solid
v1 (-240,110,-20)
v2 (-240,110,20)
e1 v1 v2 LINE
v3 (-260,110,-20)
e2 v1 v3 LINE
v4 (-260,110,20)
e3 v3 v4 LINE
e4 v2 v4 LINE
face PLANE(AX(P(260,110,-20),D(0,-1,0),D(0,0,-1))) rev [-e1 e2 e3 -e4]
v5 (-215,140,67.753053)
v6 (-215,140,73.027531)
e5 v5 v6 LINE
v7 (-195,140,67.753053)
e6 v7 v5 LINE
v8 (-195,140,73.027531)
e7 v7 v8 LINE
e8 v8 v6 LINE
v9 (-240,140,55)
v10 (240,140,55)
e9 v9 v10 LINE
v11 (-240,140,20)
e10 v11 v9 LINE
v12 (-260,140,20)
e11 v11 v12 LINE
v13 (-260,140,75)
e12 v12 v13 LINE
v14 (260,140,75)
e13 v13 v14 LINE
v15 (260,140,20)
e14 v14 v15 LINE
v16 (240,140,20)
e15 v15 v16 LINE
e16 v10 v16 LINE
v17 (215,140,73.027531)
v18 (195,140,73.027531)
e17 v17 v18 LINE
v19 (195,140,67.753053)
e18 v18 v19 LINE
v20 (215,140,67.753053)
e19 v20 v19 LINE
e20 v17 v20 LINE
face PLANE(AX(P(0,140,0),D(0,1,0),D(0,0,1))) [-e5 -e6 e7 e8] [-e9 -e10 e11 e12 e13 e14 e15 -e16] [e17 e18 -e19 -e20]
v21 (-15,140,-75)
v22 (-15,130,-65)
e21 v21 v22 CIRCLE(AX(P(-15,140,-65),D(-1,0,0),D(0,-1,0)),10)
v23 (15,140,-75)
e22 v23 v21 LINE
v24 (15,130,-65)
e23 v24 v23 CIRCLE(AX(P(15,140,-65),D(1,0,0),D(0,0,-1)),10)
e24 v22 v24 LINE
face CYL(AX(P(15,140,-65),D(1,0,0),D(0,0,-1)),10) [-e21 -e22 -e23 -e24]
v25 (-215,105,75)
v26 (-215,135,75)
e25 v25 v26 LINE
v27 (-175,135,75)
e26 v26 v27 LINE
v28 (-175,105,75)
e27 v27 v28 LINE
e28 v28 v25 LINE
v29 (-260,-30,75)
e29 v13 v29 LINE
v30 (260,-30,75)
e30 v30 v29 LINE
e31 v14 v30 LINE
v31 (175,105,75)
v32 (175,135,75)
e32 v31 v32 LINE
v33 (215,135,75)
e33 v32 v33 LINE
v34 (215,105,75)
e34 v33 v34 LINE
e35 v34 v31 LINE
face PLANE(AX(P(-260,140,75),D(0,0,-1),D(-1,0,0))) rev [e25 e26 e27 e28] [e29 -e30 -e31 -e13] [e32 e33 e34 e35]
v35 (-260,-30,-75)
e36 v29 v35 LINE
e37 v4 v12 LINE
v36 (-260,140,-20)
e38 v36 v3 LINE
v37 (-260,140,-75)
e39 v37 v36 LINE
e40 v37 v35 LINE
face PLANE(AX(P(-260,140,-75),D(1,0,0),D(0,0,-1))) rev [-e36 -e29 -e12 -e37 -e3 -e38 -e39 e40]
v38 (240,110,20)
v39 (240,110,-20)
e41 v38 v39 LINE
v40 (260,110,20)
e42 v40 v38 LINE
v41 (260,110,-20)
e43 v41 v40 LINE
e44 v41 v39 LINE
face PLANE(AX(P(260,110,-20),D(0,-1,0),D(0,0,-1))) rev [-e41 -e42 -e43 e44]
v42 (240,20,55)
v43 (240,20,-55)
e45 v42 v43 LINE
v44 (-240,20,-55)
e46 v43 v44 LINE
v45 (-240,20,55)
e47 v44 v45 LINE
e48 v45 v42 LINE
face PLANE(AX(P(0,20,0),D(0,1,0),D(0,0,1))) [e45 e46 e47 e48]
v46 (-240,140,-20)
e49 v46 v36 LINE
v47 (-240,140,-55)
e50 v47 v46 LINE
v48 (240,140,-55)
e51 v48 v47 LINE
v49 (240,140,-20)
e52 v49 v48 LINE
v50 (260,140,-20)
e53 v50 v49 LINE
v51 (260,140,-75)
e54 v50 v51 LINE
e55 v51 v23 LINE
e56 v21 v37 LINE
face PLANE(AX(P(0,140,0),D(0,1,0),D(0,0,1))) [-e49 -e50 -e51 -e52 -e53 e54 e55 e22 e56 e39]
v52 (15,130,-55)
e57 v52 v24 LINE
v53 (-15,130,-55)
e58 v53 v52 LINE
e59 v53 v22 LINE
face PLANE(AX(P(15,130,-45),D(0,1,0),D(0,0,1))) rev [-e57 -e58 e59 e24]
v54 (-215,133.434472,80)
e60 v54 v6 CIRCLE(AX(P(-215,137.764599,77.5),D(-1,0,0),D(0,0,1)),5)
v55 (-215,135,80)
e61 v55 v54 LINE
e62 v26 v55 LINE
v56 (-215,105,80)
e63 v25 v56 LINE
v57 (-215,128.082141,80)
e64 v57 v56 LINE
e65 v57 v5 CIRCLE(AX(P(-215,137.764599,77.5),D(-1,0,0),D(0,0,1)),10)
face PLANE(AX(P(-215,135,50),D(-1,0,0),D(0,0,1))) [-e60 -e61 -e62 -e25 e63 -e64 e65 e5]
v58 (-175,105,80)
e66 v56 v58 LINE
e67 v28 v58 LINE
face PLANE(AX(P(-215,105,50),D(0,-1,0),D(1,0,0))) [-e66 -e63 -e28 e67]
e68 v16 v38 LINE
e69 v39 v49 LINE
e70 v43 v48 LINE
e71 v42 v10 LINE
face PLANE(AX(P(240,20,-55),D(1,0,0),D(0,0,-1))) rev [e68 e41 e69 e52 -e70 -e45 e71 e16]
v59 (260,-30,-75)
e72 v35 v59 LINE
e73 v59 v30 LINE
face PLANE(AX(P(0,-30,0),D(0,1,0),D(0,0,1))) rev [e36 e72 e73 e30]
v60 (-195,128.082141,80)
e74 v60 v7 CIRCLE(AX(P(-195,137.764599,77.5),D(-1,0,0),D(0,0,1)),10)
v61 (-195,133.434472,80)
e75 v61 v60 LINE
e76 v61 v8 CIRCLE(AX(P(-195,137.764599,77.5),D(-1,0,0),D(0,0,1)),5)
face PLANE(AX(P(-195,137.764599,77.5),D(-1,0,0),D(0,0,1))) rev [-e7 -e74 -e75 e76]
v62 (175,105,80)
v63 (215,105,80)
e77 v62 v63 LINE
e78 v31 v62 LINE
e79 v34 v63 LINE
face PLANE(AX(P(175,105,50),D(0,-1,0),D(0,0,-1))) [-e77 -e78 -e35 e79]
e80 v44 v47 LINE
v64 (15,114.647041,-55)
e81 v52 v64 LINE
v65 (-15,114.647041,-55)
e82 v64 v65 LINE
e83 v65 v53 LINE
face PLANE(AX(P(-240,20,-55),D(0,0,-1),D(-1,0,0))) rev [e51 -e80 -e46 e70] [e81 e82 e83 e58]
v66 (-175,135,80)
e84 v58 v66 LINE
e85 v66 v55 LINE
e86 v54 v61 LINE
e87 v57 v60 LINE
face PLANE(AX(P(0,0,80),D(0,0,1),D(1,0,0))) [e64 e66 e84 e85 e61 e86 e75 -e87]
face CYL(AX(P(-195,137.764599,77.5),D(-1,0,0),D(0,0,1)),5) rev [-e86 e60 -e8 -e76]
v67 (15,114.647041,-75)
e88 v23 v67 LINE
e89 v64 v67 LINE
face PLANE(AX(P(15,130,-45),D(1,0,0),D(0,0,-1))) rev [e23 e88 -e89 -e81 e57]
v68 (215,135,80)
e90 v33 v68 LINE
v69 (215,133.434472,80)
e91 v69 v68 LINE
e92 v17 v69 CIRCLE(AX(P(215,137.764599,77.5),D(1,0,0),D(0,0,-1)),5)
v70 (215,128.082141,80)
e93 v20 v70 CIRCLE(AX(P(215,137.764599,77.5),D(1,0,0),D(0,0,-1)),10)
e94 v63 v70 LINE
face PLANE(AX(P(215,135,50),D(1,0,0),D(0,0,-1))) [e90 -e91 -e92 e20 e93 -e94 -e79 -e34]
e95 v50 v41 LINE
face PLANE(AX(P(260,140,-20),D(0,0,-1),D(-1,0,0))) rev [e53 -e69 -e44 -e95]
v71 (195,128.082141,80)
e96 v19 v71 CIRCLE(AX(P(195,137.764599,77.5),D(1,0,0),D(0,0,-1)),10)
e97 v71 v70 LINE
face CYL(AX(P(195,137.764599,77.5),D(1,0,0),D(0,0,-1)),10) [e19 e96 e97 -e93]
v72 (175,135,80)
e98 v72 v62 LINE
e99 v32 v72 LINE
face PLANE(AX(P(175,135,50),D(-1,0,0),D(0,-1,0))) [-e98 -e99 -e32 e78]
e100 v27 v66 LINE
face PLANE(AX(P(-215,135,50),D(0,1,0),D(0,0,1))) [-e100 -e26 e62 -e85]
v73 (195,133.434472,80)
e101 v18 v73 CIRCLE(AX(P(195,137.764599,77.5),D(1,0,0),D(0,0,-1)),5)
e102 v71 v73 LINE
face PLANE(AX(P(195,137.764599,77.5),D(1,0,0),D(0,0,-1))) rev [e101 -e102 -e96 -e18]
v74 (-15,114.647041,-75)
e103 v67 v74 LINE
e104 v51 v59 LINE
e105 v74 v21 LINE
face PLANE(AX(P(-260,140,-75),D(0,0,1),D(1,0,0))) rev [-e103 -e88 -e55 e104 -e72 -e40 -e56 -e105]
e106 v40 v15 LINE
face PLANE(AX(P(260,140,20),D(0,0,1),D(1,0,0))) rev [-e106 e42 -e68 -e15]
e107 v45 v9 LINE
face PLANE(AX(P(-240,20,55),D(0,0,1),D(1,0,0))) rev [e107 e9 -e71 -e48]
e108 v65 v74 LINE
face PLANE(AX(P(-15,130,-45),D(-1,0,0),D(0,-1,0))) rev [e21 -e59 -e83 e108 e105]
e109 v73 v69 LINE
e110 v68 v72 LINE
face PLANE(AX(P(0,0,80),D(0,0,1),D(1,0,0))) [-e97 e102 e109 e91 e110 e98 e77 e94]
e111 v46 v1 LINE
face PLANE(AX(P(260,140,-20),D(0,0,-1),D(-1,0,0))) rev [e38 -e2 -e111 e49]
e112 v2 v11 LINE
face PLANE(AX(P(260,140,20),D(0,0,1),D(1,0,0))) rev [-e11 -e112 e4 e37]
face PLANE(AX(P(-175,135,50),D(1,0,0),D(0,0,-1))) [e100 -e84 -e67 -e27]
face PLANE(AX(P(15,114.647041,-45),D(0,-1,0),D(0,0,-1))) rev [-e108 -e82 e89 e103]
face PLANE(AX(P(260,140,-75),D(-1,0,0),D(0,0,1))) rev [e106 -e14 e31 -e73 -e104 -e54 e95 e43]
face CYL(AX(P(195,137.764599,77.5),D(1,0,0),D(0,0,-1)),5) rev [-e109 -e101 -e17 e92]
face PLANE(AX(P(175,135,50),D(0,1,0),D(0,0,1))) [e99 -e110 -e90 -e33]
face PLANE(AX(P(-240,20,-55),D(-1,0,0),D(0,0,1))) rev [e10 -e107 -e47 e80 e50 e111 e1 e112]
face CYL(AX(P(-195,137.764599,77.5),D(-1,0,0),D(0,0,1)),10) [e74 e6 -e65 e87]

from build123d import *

# Parameters (mm, degrees)
SKETCH_1_W          = 520
SKETCH_1_H          = 150
EXTRUDE_1_DEPTH     = 140
SKETCH_2_W          = 480
SKETCH_2_H          = 110
CUT_EXTRUDE_1_DEPTH = 120
SKETCH_4_W          = 40
SKETCH_4_H          = 30
EXTRUDE_2_DEPTH     = 30
SKETCH_5_W          = 40
SKETCH_5_H          = 30
EXTRUDE_3_DEPTH     = 30
SKETCH_7_R          = 10
SKETCH_7_R_2        = 5
EXTRUDE_1_2_DEPTH   = 20
EXTRUDE_START       = -20
SKETCH_9_R          = 10
SKETCH_9_R_2        = 5
EXTRUDE_2_2_DEPTH   = 20
SKETCH_11_W         = 40
SKETCH_11_H         = 30
CUT_EXTRUDE_3_DEPTH = 548.622704745
SKETCH_13_W         = 520
SKETCH_13_H         = 150
EXTRUDE_6_DEPTH     = 30
SKETCH_14_W         = 40
SKETCH_14_H         = 5
CUT_EXTRUDE_6_DEPTH = 30
SKETCH_15_W         = 40
SKETCH_15_H         = 5
CUT_EXTRUDE_7_DEPTH = 30
SKETCH_18_W         = 30
SKETCH_18_H         = 15.352958973
CUT_EXTRUDE_8_DEPTH = 30
FILLET_1_R          = 10


with BuildPart() as part:
    # 草圖1 → Extrude 1 (new body)
    with BuildSketch(Plane(origin=(0, 0, 0), x_dir=(1, 0, 0), z_dir=(0, 1, 0))):
        Rectangle(SKETCH_1_W, SKETCH_1_H)
    extrude(amount=EXTRUDE_1_DEPTH)

    # 草圖2 → 除料-伸長1 (cut)
    with BuildSketch(Plane(origin=(0, 140, 0), x_dir=(1, 0, 0), z_dir=(0, 1, 0))):
        Rectangle(SKETCH_2_W, SKETCH_2_H)
    extrude(amount=-CUT_EXTRUDE_1_DEPTH, mode=Mode.SUBTRACT)

    # 草圖4 → Extrude 2 (add)
    with BuildSketch(Plane.XY.offset(80)):
        with Locations((-195, 120)):
            Rectangle(SKETCH_4_W, SKETCH_4_H)
    extrude(amount=-EXTRUDE_2_DEPTH)

    # 草圖5 → 填料-伸長3 (add)
    with BuildSketch(Plane.XY.offset(80)):
        with Locations((195, 120)):
            Rectangle(SKETCH_5_W, SKETCH_5_H)
    extrude(amount=-EXTRUDE_3_DEPTH)

    # 草圖7 → Extrude 1 2 (add)
    with BuildSketch(Plane(origin=(215, 0, 0), x_dir=(0, 0, -1), z_dir=(1, 0, 0))):
        with Locations((-77.5, 137.764599119)):
            Circle(SKETCH_7_R)
        with Locations((-77.5, 137.764599119)):
            Circle(SKETCH_7_R_2, mode=Mode.SUBTRACT)
    extrude(amount=-EXTRUDE_1_2_DEPTH)

    # 草圖9 → Extrude 2 2 (add)
    with BuildSketch(Plane.ZY.offset(215).offset(EXTRUDE_START)):
        with Locations((77.5, 137.764599119)):
            Circle(SKETCH_9_R)
        with Locations((77.5, 137.764599119)):
            Circle(SKETCH_9_R_2, mode=Mode.SUBTRACT)
    extrude(amount=EXTRUDE_2_2_DEPTH)

    # 草圖11 → 除料-伸長3 (cut, through all)
    with BuildSketch(Plane.ZY.offset(260)):
        with Locations((0, 125)):
            Rectangle(SKETCH_11_W, SKETCH_11_H)
    extrude(amount=-CUT_EXTRUDE_3_DEPTH, mode=Mode.SUBTRACT)

    # 草圖13 → 填料-伸長6 (add)
    with BuildSketch(Plane.XZ):
        Rectangle(SKETCH_13_W, SKETCH_13_H)
    extrude(amount=EXTRUDE_6_DEPTH)

    # 草圖14 → 除料-伸長6 (cut)
    with BuildSketch(Plane(origin=(0, 135, 0), x_dir=(1, 0, 0), z_dir=(0, 1, 0))):
        with Locations((195, -52.5)):
            Rectangle(SKETCH_14_W, SKETCH_14_H)
    extrude(amount=-CUT_EXTRUDE_6_DEPTH, mode=Mode.SUBTRACT)

    # 草圖15 → 除料-伸長7 (cut)
    with BuildSketch(Plane(origin=(0, 135, 0), x_dir=(1, 0, 0), z_dir=(0, 1, 0))):
        with Locations((-195, -52.5)):
            Rectangle(SKETCH_15_W, SKETCH_15_H)
    extrude(amount=-CUT_EXTRUDE_7_DEPTH, mode=Mode.SUBTRACT)

    # 草圖18 → 除料-伸長8 (cut)
    with BuildSketch(Plane(origin=(0, 0, -75), x_dir=(-1, 0, 0), z_dir=(0, 0, -1))):
        with Locations((0, 122.323520514)):
            Rectangle(SKETCH_18_W, SKETCH_18_H)
    extrude(amount=-CUT_EXTRUDE_8_DEPTH, mode=Mode.SUBTRACT)

    # 圓角1
    fillet_1_edges = [part.edges().sort_by_distance(p)[0] for p in [
        (0, 130, -75),
    ]]
    fillet(fillet_1_edges, radius=FILLET_1_R - 0.0001)  # a hair under: the kernel refuses the full size


solid = part.part
